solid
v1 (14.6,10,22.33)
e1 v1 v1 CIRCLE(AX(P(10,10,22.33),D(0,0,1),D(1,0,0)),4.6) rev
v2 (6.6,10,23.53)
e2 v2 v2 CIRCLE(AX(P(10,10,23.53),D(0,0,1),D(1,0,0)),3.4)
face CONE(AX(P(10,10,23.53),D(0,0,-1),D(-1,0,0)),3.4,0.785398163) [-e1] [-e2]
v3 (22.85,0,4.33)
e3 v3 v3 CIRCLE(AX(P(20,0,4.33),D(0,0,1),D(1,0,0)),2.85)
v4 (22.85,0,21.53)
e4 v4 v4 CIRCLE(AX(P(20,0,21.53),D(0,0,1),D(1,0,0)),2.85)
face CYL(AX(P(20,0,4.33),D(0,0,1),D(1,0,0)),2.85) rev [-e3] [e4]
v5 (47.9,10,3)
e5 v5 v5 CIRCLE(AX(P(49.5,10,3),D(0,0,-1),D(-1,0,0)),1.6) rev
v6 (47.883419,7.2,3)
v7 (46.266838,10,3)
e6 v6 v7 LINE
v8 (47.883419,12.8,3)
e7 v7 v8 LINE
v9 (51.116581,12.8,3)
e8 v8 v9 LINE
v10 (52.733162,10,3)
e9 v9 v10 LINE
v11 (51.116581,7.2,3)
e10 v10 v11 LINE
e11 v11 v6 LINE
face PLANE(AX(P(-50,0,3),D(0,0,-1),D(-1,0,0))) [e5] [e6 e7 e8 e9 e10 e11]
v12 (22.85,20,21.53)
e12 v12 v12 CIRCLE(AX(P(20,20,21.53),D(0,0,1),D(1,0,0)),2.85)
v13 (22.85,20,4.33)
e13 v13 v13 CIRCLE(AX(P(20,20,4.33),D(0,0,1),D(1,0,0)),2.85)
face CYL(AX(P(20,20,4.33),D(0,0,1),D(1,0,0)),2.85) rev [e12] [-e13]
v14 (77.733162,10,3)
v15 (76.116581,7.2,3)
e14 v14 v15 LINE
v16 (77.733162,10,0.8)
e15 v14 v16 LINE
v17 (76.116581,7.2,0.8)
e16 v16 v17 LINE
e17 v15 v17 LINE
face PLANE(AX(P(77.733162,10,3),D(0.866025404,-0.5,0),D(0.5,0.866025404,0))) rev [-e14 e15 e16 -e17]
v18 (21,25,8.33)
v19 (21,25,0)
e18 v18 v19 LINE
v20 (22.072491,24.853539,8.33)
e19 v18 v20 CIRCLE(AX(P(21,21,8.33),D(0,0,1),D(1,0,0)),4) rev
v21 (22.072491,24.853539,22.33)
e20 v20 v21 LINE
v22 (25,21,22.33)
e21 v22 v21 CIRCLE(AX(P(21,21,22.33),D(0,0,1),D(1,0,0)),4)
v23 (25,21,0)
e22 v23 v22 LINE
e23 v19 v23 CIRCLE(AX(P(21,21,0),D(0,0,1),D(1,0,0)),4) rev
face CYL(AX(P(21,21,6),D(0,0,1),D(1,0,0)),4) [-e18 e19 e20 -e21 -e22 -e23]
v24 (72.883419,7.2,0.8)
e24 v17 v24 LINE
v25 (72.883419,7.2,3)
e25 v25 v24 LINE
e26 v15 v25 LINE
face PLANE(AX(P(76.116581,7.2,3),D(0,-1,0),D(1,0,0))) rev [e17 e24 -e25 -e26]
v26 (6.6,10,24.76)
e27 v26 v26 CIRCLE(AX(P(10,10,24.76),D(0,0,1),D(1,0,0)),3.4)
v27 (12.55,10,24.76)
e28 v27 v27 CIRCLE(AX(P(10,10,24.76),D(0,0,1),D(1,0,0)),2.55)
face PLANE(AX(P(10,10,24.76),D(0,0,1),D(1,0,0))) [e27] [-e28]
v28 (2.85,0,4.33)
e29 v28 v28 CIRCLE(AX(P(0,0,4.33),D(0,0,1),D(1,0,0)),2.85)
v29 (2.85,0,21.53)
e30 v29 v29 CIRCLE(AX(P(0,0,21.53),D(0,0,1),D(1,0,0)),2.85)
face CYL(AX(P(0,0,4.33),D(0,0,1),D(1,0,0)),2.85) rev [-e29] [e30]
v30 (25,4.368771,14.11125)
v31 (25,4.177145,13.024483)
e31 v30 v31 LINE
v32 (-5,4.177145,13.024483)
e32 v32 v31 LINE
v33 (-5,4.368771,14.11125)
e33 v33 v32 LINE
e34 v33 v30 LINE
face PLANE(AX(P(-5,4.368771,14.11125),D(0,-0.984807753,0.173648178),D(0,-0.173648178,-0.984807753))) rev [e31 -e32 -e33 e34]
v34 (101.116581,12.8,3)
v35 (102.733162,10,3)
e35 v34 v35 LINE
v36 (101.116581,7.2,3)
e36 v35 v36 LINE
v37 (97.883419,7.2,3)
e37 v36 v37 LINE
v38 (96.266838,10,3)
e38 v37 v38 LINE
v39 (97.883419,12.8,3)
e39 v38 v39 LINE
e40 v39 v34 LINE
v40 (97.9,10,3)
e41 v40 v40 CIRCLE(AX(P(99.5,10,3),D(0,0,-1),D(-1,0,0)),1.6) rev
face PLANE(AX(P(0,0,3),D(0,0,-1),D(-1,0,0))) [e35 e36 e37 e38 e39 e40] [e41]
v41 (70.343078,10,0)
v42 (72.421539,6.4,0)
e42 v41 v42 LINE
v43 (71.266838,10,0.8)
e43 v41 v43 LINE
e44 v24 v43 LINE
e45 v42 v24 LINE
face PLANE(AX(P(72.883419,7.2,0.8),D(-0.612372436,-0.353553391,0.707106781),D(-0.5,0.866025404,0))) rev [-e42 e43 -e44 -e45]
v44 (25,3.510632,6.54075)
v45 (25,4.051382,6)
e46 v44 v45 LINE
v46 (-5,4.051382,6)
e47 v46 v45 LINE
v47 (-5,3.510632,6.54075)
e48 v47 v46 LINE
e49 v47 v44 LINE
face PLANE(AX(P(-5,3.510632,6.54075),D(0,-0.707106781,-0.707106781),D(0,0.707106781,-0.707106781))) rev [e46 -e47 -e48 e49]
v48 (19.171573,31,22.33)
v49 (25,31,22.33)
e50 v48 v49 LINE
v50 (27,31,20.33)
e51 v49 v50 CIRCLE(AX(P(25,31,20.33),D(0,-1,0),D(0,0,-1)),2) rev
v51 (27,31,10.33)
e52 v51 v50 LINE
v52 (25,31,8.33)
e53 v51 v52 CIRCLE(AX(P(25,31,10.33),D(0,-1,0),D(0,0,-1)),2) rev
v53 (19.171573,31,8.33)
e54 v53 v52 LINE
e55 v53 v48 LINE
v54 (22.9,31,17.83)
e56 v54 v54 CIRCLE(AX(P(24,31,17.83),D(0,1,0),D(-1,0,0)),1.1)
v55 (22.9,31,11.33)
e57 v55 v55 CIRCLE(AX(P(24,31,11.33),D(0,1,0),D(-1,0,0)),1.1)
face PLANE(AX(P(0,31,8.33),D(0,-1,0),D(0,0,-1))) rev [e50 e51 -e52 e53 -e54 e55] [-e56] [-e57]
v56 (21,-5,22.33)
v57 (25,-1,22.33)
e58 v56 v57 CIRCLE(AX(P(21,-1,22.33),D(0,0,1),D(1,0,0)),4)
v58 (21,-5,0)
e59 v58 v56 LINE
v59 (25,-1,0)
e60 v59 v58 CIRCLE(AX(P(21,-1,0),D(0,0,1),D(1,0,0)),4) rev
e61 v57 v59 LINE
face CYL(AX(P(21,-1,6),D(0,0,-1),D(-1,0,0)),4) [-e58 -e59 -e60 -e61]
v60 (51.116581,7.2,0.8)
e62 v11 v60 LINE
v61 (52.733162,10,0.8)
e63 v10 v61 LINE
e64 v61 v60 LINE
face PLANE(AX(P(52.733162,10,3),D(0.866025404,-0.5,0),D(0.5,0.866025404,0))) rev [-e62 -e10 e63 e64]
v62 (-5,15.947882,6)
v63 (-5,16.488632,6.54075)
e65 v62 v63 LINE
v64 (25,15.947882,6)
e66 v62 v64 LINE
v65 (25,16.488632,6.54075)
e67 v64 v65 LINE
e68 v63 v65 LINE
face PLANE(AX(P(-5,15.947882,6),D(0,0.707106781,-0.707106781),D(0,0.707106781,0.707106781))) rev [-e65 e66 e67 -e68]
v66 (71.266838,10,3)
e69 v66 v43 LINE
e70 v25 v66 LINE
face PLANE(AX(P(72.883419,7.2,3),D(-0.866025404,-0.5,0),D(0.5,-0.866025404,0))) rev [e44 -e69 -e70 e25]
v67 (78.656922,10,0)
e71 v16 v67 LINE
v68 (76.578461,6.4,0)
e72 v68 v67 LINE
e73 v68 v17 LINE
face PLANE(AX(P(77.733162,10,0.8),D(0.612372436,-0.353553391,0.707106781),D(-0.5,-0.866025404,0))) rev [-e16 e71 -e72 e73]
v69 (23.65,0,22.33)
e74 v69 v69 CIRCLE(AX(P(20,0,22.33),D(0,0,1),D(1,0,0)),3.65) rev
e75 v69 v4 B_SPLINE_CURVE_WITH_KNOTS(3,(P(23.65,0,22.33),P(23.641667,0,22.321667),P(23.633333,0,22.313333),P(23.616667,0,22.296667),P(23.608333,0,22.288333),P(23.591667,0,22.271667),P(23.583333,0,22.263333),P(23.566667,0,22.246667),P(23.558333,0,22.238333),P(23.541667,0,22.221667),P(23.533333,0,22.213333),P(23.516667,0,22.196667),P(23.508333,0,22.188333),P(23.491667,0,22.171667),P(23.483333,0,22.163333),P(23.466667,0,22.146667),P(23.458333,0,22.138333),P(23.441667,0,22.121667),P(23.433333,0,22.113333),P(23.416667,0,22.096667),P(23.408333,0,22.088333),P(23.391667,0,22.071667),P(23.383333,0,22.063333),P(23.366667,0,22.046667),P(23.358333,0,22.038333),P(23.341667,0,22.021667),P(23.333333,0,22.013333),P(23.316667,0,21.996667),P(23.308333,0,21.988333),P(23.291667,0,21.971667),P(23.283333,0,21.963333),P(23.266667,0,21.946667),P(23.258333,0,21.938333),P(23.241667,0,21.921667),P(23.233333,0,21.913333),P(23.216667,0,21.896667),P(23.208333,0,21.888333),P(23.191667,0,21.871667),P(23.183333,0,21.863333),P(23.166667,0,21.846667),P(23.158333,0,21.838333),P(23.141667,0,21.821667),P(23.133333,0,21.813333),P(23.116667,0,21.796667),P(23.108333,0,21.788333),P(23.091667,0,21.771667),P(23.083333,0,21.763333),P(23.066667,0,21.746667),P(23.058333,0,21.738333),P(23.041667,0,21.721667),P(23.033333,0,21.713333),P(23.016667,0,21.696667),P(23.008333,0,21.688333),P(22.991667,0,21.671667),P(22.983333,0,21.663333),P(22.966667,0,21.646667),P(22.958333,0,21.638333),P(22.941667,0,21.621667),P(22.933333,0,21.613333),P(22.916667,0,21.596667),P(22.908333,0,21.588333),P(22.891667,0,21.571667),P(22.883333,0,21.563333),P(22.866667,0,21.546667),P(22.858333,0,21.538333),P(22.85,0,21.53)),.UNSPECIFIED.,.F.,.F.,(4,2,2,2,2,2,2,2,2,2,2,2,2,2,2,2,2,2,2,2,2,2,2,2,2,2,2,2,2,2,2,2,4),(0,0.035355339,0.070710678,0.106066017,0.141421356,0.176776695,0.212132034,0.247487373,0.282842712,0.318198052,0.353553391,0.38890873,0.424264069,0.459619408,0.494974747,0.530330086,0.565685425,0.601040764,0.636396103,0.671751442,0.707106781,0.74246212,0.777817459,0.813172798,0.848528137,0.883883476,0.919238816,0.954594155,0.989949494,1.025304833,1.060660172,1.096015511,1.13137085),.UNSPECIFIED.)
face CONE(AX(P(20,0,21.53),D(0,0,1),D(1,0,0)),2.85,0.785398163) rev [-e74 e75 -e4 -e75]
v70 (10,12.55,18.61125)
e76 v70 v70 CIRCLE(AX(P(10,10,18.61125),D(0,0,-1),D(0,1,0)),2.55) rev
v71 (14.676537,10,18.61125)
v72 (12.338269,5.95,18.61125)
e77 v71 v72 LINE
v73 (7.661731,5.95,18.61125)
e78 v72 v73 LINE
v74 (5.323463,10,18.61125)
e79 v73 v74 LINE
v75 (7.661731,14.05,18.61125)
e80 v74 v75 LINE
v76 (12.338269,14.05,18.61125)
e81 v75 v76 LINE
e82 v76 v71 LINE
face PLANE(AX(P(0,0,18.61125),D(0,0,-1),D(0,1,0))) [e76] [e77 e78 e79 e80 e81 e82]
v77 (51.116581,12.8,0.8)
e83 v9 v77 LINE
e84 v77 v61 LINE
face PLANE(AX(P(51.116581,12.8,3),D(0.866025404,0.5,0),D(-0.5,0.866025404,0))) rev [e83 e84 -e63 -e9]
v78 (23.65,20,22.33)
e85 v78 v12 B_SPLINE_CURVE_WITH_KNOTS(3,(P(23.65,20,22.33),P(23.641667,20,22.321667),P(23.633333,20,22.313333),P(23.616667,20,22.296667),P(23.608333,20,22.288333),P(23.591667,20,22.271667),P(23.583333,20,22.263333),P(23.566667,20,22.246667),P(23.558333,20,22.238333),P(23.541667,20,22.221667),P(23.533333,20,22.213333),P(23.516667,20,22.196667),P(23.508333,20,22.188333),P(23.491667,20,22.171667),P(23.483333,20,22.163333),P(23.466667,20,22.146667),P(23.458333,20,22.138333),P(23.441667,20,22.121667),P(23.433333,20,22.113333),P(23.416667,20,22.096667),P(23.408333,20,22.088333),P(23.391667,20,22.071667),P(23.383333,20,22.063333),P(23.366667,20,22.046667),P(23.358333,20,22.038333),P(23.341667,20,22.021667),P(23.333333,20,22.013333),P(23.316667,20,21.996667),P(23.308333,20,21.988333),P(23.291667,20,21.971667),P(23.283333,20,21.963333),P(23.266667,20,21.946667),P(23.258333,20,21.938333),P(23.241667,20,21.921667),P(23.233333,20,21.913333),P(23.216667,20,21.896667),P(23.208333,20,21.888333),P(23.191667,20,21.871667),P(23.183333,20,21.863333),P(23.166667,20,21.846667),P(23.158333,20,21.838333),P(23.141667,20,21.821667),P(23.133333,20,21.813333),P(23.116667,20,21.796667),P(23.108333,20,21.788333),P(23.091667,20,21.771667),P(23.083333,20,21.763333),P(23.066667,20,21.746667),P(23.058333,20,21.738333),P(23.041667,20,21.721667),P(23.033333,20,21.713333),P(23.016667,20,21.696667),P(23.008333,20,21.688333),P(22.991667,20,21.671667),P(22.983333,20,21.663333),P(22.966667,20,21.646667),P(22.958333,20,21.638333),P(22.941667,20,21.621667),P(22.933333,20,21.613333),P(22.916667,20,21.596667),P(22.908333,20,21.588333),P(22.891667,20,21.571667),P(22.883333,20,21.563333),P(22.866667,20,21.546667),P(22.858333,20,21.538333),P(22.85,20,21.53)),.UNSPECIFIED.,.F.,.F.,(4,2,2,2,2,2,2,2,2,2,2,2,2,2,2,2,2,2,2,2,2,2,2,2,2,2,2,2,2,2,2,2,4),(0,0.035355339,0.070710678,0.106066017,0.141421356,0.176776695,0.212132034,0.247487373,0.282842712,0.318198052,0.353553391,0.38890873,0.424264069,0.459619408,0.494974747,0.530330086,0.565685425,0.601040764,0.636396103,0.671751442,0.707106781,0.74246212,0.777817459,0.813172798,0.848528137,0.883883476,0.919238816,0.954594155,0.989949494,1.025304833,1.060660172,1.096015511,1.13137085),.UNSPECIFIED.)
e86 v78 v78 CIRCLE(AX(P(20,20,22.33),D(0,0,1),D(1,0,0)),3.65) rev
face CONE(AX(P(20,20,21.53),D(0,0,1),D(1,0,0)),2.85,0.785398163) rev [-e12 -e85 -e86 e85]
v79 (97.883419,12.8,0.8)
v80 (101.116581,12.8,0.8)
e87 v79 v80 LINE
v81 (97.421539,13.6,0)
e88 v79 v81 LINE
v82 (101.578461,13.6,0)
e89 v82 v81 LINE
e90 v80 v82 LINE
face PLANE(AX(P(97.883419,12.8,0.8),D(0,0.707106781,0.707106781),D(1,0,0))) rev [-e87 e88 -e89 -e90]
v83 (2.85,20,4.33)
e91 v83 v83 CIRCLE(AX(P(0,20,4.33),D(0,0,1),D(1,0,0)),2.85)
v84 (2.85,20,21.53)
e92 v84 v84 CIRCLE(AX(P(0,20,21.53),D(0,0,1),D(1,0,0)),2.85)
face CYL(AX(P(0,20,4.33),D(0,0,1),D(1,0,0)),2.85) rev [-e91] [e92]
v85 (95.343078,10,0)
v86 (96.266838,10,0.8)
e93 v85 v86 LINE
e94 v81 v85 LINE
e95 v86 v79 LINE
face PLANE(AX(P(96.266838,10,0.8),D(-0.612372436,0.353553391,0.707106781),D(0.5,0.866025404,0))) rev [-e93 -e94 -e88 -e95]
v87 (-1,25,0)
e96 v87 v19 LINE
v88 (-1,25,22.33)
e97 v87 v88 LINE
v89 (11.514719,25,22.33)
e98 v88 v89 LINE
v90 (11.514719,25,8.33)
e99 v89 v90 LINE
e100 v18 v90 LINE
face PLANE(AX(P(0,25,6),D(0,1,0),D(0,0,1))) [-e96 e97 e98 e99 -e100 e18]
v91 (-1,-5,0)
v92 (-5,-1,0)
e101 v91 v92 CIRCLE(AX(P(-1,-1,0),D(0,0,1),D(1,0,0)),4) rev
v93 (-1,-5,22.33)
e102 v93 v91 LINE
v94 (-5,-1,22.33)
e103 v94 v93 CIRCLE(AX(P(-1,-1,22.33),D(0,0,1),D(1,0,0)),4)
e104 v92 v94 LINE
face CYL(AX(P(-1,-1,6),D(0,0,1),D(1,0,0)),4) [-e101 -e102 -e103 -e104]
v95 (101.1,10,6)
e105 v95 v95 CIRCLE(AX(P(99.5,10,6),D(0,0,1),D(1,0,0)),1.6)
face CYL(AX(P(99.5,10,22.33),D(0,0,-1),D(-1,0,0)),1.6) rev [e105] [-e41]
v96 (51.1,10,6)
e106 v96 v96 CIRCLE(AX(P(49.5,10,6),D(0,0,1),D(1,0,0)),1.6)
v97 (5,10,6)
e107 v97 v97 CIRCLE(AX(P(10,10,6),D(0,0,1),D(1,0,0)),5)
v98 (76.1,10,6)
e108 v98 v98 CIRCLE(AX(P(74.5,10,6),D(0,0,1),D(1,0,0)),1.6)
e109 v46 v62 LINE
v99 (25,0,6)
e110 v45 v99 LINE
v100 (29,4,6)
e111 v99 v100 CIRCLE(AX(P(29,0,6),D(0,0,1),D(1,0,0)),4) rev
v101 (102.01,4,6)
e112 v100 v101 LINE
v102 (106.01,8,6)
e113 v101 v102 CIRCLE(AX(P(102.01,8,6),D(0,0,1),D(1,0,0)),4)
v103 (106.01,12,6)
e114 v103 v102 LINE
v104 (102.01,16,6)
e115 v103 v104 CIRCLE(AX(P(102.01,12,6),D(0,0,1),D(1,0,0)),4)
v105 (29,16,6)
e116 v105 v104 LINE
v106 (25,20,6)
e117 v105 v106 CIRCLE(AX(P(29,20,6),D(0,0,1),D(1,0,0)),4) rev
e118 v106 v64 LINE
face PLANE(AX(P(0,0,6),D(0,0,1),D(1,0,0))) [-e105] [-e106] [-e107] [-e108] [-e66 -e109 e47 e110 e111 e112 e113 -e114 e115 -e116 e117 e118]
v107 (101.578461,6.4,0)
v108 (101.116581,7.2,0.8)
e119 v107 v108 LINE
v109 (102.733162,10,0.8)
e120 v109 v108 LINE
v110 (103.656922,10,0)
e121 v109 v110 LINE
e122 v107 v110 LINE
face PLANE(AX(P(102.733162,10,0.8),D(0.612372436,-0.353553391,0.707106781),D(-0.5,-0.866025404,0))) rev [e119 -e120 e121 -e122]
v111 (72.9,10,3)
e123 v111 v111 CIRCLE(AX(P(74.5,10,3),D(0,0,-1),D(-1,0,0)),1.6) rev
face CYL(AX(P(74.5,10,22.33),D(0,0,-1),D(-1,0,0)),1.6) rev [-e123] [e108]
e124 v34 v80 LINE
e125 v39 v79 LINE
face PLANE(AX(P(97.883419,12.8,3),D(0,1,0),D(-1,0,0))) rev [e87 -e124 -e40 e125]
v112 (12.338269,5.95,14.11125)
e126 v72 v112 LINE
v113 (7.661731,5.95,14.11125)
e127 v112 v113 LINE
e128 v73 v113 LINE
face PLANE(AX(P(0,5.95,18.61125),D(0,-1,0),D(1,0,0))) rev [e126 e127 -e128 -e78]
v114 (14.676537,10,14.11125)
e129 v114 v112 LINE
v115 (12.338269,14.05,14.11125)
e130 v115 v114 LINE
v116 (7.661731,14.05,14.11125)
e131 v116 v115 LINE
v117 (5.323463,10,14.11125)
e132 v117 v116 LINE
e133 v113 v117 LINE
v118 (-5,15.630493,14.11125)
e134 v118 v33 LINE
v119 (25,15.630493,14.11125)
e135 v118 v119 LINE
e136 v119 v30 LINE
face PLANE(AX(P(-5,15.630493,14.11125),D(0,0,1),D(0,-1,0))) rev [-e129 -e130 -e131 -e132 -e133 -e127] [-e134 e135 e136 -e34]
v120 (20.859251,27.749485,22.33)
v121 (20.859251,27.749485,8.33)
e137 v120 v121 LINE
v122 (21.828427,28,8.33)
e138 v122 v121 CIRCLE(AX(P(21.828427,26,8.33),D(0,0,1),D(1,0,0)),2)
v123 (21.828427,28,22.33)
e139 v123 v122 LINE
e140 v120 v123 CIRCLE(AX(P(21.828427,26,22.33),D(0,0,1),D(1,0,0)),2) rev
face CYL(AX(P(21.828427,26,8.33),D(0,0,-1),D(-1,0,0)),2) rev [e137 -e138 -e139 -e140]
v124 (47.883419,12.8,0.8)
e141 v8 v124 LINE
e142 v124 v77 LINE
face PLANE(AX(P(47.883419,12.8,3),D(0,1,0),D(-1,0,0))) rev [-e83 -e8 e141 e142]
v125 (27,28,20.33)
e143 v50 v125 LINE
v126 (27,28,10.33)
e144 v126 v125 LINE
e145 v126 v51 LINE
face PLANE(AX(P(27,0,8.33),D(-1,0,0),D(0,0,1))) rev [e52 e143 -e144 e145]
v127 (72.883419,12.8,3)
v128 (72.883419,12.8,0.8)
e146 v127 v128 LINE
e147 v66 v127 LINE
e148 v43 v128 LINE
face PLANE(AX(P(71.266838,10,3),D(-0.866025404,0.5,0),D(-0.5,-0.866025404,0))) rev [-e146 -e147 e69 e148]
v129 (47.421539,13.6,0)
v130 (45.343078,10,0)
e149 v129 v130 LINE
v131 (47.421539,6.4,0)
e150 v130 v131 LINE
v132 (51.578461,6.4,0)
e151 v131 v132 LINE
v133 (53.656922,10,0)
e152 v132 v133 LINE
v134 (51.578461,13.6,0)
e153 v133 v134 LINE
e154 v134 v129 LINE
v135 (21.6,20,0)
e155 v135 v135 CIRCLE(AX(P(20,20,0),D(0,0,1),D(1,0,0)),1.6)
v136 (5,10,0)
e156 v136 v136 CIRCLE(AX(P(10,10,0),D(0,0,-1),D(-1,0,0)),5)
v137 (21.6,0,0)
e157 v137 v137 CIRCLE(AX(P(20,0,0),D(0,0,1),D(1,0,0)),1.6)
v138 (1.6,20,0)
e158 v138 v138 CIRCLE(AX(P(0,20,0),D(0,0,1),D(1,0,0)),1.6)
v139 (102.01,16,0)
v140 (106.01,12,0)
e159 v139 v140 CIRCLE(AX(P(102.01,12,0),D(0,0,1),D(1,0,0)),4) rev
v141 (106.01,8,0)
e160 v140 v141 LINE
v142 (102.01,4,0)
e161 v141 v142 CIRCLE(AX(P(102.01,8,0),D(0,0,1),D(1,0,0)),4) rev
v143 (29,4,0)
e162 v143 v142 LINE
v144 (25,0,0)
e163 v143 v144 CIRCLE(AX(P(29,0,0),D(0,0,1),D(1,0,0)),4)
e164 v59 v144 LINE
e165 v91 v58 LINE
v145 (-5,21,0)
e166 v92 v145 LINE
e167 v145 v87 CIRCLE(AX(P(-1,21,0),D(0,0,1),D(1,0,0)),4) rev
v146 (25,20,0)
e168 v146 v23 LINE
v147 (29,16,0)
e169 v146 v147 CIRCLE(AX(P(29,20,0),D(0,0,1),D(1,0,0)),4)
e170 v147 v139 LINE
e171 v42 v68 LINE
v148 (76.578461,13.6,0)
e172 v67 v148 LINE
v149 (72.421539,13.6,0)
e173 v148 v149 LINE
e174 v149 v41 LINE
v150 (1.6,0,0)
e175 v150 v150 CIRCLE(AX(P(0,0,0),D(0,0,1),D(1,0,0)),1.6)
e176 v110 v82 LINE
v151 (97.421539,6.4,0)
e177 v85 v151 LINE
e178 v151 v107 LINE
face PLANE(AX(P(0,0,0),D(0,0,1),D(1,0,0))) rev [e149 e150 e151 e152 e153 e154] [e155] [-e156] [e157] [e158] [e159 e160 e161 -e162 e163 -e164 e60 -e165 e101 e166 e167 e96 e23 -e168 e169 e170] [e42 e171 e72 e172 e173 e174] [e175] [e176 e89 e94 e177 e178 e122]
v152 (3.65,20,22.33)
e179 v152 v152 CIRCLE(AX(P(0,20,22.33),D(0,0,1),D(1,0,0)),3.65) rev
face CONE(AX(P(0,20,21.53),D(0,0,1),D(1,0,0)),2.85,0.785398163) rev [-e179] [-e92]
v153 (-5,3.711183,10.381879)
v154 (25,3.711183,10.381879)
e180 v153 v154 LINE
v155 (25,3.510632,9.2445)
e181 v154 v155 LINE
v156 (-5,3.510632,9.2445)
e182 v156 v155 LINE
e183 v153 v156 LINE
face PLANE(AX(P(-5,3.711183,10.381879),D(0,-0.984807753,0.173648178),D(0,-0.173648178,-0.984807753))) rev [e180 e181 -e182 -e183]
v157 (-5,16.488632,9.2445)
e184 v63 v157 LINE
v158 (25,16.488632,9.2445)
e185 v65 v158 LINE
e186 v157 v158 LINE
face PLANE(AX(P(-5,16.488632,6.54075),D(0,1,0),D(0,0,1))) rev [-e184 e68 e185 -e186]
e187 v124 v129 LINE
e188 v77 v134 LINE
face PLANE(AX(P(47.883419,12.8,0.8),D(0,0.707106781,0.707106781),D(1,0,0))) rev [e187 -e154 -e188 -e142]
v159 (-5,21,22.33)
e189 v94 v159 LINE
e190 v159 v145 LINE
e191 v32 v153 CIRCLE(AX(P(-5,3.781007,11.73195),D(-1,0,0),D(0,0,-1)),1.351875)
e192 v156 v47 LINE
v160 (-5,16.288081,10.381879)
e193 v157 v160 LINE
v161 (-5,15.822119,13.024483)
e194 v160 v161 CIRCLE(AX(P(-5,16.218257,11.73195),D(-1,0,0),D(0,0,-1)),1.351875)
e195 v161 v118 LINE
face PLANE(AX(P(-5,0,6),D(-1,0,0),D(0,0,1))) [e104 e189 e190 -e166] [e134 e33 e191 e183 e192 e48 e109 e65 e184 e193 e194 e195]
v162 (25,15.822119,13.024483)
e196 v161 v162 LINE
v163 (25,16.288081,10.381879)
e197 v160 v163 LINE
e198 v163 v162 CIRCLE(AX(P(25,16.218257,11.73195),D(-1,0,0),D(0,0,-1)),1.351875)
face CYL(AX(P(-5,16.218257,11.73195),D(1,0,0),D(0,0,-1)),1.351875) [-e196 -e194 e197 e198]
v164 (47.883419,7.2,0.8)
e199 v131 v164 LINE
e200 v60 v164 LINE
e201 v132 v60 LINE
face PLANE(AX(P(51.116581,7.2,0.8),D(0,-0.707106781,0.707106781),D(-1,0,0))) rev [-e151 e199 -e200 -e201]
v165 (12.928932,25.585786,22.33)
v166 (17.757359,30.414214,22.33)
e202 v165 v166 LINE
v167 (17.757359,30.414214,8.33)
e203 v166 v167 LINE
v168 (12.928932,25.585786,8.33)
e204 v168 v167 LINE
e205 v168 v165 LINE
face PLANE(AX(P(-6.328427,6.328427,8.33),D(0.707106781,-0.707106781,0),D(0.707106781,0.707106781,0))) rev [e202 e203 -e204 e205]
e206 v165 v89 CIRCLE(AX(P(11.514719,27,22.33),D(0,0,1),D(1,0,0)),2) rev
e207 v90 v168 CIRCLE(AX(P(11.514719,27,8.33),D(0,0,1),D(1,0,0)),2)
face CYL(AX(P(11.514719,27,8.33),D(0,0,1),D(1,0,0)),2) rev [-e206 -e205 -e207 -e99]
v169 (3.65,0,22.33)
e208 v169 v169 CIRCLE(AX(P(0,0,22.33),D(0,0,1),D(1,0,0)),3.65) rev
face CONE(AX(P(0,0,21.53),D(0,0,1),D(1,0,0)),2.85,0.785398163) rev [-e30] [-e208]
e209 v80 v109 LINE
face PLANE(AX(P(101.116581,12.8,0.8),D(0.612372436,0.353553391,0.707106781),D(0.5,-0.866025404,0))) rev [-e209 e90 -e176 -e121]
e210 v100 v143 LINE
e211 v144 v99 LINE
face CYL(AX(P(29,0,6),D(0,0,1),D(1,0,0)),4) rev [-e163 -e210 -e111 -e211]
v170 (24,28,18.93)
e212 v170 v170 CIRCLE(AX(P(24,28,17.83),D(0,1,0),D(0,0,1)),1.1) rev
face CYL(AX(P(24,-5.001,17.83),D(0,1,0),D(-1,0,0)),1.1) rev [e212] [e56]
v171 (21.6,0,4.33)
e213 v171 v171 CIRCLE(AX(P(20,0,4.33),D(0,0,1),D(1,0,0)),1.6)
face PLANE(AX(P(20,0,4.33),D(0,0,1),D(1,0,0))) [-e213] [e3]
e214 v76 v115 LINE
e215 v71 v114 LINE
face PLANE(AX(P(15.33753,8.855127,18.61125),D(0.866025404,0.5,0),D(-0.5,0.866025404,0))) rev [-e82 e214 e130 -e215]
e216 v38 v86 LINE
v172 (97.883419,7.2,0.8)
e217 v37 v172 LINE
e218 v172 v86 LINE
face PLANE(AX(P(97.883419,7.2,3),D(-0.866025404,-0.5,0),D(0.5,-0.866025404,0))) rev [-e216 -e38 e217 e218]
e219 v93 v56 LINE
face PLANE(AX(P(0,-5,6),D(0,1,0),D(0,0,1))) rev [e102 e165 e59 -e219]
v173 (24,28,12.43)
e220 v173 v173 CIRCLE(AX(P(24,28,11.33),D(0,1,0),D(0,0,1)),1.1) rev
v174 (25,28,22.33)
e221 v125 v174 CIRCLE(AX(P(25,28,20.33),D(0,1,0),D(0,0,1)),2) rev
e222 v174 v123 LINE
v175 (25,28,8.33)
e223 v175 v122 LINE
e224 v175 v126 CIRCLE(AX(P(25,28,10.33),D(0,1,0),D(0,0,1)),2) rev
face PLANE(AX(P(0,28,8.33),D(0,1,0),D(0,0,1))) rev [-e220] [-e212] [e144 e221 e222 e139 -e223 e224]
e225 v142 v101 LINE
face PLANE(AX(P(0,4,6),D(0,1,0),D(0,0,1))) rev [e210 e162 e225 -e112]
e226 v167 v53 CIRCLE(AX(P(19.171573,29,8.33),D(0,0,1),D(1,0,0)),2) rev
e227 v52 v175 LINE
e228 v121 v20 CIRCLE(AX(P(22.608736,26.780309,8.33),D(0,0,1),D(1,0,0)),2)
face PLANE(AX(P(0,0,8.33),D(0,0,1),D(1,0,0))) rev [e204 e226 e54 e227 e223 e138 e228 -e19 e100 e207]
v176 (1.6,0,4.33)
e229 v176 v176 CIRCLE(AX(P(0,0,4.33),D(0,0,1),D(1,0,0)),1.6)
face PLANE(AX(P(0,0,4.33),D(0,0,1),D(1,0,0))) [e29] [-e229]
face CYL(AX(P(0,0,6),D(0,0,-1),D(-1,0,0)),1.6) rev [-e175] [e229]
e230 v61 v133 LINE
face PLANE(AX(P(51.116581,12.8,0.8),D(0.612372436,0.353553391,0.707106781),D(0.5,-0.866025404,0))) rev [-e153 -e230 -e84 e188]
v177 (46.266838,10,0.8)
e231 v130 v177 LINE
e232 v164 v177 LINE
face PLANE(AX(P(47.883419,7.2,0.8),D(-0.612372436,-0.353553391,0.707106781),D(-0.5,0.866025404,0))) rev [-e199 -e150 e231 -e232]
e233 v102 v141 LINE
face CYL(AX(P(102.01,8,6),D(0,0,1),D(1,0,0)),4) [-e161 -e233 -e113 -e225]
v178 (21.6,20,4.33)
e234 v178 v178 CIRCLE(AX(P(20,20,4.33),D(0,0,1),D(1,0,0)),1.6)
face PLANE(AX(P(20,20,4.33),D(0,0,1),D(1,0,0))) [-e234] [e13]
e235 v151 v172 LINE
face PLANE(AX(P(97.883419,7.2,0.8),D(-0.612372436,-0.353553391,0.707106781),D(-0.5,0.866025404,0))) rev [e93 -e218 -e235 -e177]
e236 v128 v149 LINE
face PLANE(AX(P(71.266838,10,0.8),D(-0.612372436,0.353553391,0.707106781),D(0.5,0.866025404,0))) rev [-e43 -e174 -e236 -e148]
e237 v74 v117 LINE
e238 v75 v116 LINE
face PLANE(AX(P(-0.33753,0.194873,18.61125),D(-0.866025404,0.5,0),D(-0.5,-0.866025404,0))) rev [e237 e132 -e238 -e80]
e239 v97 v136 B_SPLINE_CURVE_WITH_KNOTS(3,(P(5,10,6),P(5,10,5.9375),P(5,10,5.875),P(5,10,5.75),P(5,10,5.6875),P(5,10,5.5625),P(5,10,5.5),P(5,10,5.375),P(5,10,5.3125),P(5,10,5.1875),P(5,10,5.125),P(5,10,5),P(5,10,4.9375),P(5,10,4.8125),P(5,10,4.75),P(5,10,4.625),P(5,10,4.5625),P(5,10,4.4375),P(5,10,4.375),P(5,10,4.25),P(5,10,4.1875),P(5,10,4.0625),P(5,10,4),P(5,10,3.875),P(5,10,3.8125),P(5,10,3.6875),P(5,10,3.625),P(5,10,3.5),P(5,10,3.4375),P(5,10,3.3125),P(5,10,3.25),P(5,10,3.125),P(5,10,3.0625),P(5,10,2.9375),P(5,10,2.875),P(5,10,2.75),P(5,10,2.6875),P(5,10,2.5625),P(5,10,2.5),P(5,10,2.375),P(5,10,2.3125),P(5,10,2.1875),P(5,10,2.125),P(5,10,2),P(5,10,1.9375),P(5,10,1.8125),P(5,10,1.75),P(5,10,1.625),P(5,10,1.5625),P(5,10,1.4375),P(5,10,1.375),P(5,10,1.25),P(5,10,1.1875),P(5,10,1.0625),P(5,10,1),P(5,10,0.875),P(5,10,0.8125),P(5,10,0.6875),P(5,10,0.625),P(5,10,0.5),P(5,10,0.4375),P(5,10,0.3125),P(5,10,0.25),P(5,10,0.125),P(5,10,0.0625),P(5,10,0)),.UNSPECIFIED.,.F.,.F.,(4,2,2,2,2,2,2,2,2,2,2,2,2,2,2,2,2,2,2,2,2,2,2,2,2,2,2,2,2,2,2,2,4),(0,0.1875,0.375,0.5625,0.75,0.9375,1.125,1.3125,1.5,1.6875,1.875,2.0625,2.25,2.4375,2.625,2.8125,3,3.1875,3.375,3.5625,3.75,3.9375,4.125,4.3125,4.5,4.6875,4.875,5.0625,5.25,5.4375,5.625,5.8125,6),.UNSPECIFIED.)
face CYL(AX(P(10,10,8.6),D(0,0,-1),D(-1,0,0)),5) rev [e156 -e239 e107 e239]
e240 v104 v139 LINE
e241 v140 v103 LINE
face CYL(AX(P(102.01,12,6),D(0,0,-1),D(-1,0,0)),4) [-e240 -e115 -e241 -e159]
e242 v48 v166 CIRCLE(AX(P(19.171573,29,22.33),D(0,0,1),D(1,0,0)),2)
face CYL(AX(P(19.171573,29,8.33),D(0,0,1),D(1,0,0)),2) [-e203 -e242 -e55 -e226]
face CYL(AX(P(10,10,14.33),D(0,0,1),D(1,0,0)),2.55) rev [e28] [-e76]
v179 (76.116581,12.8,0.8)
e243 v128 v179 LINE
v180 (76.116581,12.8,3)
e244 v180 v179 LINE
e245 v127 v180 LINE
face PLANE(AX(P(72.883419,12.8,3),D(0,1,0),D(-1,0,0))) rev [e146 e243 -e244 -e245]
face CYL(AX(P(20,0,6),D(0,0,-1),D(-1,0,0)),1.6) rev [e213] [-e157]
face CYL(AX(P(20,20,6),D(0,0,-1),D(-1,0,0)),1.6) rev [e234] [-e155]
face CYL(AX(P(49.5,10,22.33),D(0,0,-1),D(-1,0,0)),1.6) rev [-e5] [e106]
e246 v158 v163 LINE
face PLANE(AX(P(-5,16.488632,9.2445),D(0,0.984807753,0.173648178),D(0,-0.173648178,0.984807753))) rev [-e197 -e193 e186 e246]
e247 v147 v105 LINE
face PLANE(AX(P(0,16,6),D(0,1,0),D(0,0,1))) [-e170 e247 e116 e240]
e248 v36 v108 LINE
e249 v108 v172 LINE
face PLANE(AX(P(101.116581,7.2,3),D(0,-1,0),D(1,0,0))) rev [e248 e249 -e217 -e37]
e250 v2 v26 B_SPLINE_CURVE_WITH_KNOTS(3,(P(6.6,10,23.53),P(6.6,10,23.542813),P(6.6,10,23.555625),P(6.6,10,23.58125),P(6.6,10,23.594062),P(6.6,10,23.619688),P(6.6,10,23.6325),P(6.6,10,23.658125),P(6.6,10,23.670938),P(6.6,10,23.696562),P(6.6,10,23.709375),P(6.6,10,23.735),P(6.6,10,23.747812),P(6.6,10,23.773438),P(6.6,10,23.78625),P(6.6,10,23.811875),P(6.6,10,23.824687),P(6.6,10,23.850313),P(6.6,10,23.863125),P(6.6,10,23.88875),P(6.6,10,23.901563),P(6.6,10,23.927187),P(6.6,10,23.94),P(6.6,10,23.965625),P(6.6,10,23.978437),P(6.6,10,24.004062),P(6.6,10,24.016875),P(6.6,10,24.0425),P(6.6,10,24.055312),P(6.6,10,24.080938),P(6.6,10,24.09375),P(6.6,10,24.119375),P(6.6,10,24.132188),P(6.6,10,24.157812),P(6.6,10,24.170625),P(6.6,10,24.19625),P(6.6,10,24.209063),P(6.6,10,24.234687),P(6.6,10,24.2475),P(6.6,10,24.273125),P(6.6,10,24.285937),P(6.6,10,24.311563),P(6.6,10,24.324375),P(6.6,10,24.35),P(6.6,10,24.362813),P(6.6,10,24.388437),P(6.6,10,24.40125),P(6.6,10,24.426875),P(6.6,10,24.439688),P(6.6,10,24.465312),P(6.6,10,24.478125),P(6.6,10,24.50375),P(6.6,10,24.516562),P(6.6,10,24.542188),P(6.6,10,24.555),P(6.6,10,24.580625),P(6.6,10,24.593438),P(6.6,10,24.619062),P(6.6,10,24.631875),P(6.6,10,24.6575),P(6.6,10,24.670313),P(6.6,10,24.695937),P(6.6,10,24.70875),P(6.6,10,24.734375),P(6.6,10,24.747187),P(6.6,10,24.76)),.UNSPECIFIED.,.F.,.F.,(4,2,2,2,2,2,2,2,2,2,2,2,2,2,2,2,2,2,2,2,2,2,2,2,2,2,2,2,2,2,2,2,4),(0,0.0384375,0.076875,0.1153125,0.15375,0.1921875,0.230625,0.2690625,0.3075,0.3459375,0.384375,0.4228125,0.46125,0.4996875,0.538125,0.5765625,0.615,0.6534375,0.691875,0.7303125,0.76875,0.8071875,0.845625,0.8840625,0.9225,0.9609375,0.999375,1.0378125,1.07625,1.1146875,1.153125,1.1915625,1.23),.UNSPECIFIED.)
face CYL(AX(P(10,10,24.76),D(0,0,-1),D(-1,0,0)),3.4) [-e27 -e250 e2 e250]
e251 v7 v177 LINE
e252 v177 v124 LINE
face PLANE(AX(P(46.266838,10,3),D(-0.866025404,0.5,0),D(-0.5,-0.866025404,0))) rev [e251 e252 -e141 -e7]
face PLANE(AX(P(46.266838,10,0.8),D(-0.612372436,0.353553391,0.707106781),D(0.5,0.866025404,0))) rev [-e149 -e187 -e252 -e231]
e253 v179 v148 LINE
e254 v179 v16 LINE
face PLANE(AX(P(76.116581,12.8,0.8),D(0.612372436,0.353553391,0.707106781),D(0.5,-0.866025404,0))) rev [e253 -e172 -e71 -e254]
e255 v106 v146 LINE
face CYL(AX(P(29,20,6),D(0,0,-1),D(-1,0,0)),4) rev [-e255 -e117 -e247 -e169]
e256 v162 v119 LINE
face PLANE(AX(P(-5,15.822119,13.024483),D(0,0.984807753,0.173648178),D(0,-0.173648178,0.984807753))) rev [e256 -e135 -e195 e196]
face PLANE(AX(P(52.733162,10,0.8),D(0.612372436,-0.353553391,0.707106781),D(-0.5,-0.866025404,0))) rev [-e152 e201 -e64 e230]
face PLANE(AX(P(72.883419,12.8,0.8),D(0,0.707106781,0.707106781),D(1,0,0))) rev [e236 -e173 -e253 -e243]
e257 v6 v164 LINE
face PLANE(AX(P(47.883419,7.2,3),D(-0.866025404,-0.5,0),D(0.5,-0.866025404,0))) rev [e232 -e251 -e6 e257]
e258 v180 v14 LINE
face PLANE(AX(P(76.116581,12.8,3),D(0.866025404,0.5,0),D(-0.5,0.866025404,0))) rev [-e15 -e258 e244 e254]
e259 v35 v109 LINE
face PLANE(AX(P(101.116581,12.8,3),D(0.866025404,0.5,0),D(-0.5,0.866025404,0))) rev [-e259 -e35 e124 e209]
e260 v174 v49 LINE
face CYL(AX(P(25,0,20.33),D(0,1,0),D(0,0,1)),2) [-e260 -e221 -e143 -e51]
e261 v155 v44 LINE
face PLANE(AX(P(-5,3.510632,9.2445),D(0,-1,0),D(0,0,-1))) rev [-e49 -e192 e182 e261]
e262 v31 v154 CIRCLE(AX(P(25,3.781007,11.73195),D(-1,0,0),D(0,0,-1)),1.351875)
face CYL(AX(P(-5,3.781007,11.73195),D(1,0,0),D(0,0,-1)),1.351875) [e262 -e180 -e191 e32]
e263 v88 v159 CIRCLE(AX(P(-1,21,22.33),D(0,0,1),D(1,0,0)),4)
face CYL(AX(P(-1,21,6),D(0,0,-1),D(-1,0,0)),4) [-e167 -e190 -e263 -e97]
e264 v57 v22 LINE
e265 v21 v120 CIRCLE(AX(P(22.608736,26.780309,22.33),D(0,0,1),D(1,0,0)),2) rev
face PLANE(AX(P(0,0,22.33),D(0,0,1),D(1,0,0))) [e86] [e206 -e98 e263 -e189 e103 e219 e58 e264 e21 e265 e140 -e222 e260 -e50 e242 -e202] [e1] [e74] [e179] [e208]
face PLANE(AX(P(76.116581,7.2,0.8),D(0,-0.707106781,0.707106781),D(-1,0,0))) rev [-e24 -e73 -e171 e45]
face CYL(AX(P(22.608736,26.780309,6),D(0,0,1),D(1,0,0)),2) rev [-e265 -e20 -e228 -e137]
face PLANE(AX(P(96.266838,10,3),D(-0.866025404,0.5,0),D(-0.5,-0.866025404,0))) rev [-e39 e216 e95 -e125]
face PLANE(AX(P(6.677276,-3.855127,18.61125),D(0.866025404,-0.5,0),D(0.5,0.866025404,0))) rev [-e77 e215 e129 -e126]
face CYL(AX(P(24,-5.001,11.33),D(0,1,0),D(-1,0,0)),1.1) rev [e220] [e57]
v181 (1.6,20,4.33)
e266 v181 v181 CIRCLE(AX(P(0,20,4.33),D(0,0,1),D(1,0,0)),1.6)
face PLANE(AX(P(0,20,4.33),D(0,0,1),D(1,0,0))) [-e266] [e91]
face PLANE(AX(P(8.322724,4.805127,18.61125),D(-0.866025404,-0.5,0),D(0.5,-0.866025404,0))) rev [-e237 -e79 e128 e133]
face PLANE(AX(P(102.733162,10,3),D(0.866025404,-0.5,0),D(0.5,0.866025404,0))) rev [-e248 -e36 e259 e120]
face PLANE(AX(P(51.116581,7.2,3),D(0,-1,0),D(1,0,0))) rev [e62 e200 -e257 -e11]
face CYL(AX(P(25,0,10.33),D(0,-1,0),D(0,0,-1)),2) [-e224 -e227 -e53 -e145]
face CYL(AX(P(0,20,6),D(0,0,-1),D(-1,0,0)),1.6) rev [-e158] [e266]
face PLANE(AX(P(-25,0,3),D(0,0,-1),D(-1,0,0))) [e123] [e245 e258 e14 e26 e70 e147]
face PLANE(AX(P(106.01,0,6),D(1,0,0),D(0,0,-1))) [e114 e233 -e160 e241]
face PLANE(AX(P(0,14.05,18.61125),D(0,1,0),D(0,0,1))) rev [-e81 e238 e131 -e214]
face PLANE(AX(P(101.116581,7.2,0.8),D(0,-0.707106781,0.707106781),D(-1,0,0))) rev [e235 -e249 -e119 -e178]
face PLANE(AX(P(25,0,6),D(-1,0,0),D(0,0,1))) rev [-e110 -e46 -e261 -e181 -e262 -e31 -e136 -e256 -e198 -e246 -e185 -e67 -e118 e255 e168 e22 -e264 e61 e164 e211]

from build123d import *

# Parameters (mm, degrees)
SKETCH1_W                  = 30
SKETCH1_H                  = 30
SKETCH1_R                  = 1.6
SKETCH1_W_2                = 81.01
SKETCH1_H_2                = 12
BOSS_EXTRUDE1_DEPTH        = 6
SKETCH1_3_W                = 30
SKETCH1_3_H                = 30
SKETCH1_3_R                = 1.6
BOSS_EXTRUDE2_DEPTH        = 22.33
CUT_EXTRUDE1_DEPTH         = 88.671255266
SKETCH3_R                  = 2.55
CUT_EXTRUDE2_DEPTH         = 8
CUT_EXTRUDE3_DEPTH         = 4.5
SKETCH6_R                  = 5
CUT_EXTRUDE5_DEPTH         = 8.6
SKETCH7_R                  = 1.6
CUT_EXTRUDE6_DEPTH         = 112.183402538
SKETCH8_R                  = 2.85
CUT_EXTRUDE7_DEPTH         = 18
BOSS_EXTRUDE3_START        = 2.43
SKETCH9_R                  = 3.4
SKETCH9_R_2                = 2.55
BOSS_EXTRUDE3_DEPTH        = 2.43
CHAMFER1_SIZE              = 1.2
FILLET3_R                  = 4
CHAMFER2_SIZE              = 0.8
BOSS_EXTRUDE6_DEPTH        = 14
CUT_EXTRUDE10_REACH        = 116.661
SKETCH17_R                 = 1.1
FILLET5_R                  = 2
CUT_EXTRUDE11_DEPTH        = 3
CHAMFER3_SIZE              = 0.8
LPATTERN2_COUNT            = 3
LPATTERN2_PITCH            = 25
CHAMFER3_OF_LPATTERN2_SIZE = 0.8


with BuildPart() as part:
    # Sketch1 → Boss-Extrude1 (new body)
    # profile 1 of 2: a face of its own
    with BuildSketch(Plane.XY):
        with Locations((10, 10)):
            Rectangle(SKETCH1_W, SKETCH1_H)
        with Locations((20, 0)):
            Circle(SKETCH1_R, mode=Mode.SUBTRACT)
        with Locations((20, 20)):
            Circle(SKETCH1_R, mode=Mode.SUBTRACT)
        with Locations((0, 20)):
            Circle(SKETCH1_R, mode=Mode.SUBTRACT)
        Circle(SKETCH1_R, mode=Mode.SUBTRACT)
    # profile 2 of 2: a face of its own
    with BuildSketch(Plane.XY):
        with Locations((65.505, 10)):
            Rectangle(SKETCH1_W_2, SKETCH1_H_2)
    extrude(amount=BOSS_EXTRUDE1_DEPTH)

    # Sketch1<3> → Boss-Extrude2 (add)
    with BuildSketch(Plane.XY):
        with Locations((10, 10)):
            Rectangle(SKETCH1_3_W, SKETCH1_3_H)
        with Locations((20, 0)):
            Circle(SKETCH1_3_R, mode=Mode.SUBTRACT)
        with Locations((20, 20)):
            Circle(SKETCH1_3_R, mode=Mode.SUBTRACT)
        with Locations((0, 20)):
            Circle(SKETCH1_3_R, mode=Mode.SUBTRACT)
        Circle(SKETCH1_3_R, mode=Mode.SUBTRACT)
    extrude(amount=BOSS_EXTRUDE2_DEPTH)

    # Sketch2 → Cut-Extrude1 (cut, through all)
    with BuildSketch(Plane(origin=(25, 0, 0), x_dir=(0, 0, -1), z_dir=(1, 0, 0))):
        with BuildLine():
            Line((-6.54075, 16.488632043), (-9.2445, 16.488632043))
            Line((-9.2445, 16.488632043), (-10.381879417, 16.288081364))
            ThreePointArc((-10.381879417, 16.288081364), (-11.49719937, 14.886920062), (-13.024482689, 15.822119108))
            Line((-13.024482689, 15.822119108), (-14.11125, 15.630492709))
            Line((-14.11125, 15.630492709), (-14.11125, 4.368771376))
            Line((-14.11125, 4.368771376), (-13.024482689, 4.177144977))
            ThreePointArc((-13.024482689, 4.177144977), (-11.49719937, 5.112344024), (-10.381879417, 3.711182721))
            Line((-10.381879417, 3.711182721), (-9.2445, 3.510632043))
            Line((-9.2445, 3.510632043), (-6.54075, 3.510632043))
            Line((-6.54075, 3.510632043), (-6, 4.051382043))
            Line((-6, 4.051382043), (-6, 15.947882043))
            Line((-6, 15.947882043), (-6.54075, 16.488632043))
        make_face()
    extrude(amount=-CUT_EXTRUDE1_DEPTH, mode=Mode.SUBTRACT)

    # Sketch3 → Cut-Extrude2 (cut)
    with BuildSketch(Plane.XY.offset(22.33)):
        with Locations((10, 10)):
            Circle(SKETCH3_R)
    extrude(amount=-CUT_EXTRUDE2_DEPTH, mode=Mode.SUBTRACT)

    # Sketch5 → Cut-Extrude3 (cut)
    with BuildSketch(Plane(origin=(0, 0, 14.11125), x_dir=(-1, 0, 0), z_dir=(0, 0, -1))):
        Polygon((-5.32346282, 10), (-7.66173141, 14.05), (-12.33826859, 14.05), (-14.67653718, 10), (-12.33826859, 5.95), (-7.66173141, 5.95), align=None)
    extrude(amount=-CUT_EXTRUDE3_DEPTH, mode=Mode.SUBTRACT)

    # Sketch6 → Cut-Extrude5 (cut)
    with BuildSketch(Plane(origin=(0, 0, 0), x_dir=(-1, 0, 0), z_dir=(0, 0, -1))):
        with Locations((-10, 10)):
            Circle(SKETCH6_R)
    extrude(amount=-CUT_EXTRUDE5_DEPTH, mode=Mode.SUBTRACT)

    # Sketch7 → Cut-Extrude6 (cut, through all)
    with BuildSketch(Plane(origin=(0, 0, 0), x_dir=(-1, 0, 0), z_dir=(0, 0, -1))):
        with BuildLine():
            ThreePointArc((-101.1, 10), (-99.5, 8.4), (-97.9, 10))
            Line((-97.9, 10), (-101.1, 10))
        make_face()
        with BuildLine():
            Line((-101.1, 10), (-97.9, 10))
            ThreePointArc((-97.9, 10), (-99.5, 11.6), (-101.1, 10))
        make_face()
        with Locations((-74.5, 10)):
            Circle(SKETCH7_R)
        with Locations((-49.5, 10)):
            Circle(SKETCH7_R)
    extrude(amount=-CUT_EXTRUDE6_DEPTH, mode=Mode.SUBTRACT)

    # Sketch8 → Cut-Extrude7 (cut)
    with BuildSketch(Plane.XY.offset(22.33)):
        with Locations((20, 20)):
            Circle(SKETCH8_R)
        with Locations((20, 0)):
            Circle(SKETCH8_R)
        Circle(SKETCH8_R)
        with Locations((0, 20)):
            Circle(SKETCH8_R)
    extrude(amount=-CUT_EXTRUDE7_DEPTH, mode=Mode.SUBTRACT)

    # Sketch9 → Boss-Extrude3 (add)
    with BuildSketch(Plane.XY.offset(22.33).offset(BOSS_EXTRUDE3_START)):
        with Locations(Location((10, 10, 0), (0, 0, 180))):
            Circle(SKETCH9_R)
        with Locations((10, 10)):
            Circle(SKETCH9_R_2, mode=Mode.SUBTRACT)
    extrude(amount=-BOSS_EXTRUDE3_DEPTH)

    # Chamfer1
    chamfer1_edges = [part.edges().sort_by_distance(p)[0] for p in [
        (13.4, 10, 22.33),
    ]]
    chamfer(chamfer1_edges, length=CHAMFER1_SIZE)

    # Fillet3
    fillet3_edges = [part.edges().sort_by_distance(p)[0] for p in [
        (-5, -5, 11.165),
        (-5, 25, 11.165),
        (25, 25, 11.165),
        (25, 16, 3),
        (106.01, 16, 3),
        (106.01, 4, 3),
        (25, 4, 3),
        (25, -5, 11.165),
    ]]
    fillet(fillet3_edges, radius=FILLET3_R)

    # Chamfer2
    chamfer2_edges = [part.edges().sort_by_distance(p)[0] for p in [
        (-2.85, 20, 22.33),
        (-2.85, 0, 22.33),
        (17.15, 0, 22.33),
        (17.15, 20, 22.33),
    ]]
    chamfer(chamfer2_edges, length=CHAMFER2_SIZE)

    # Sketch15 → Boss-Extrude6 (add)
    with BuildSketch(Plane.XY.offset(22.33)):
        Polygon((18.343145751, 31), (12.343145751, 25), (18, 25), (21, 28), (27, 28), (27, 31), align=None)
    extrude(amount=-BOSS_EXTRUDE6_DEPTH)

    # Sketch17 → Cut-Extrude10 (cut, up to next)
    with BuildSketch(Plane(origin=(0, 31, 0), x_dir=(1, 0, 0), z_dir=(0, 1, 0)), mode=Mode.PRIVATE) as cut_extrude10_sk1:
        with Locations(Location((24, -11.33, 0), (0, 0, 180))):
            Circle(SKETCH17_R)
    cut_extrude10_tool1 = extrude(cut_extrude10_sk1.sketch, amount=-CUT_EXTRUDE10_REACH, mode=Mode.PRIVATE) & part.part
    # Sketch17 → Cut-Extrude10 (cut, up to next)
    with BuildSketch(Plane(origin=(0, 31, 0), x_dir=(1, 0, 0), z_dir=(0, 1, 0)), mode=Mode.PRIVATE) as cut_extrude10_sk2:
        with Locations(Location((24, -17.83, 0), (0, 0, 180))):
            Circle(SKETCH17_R)
    cut_extrude10_tool2 = extrude(cut_extrude10_sk2.sketch, amount=-CUT_EXTRUDE10_REACH, mode=Mode.PRIVATE) & part.part
    add(cut_extrude10_tool1.solids().sort_by_distance((24, 31, 11.33))[0], mode=Mode.SUBTRACT)
    add(cut_extrude10_tool2.solids().sort_by_distance((24, 31, 17.83))[0], mode=Mode.SUBTRACT)

    # Fillet5
    # the kernel refuses this fillet: 2 mm, written as the material it adds along each edge
    with BuildSketch(Plane(origin=(21, 28, 22.33), x_dir=(-0.7071067811865475, -0.7071067811865475, 0), z_dir=(0, 0, -1))) as fillet5_piece_1:
        with BuildLine():
            CenterArc((FILLET5_R * 0.414213562373, -FILLET5_R), FILLET5_R, 90, 45)
            Line((-FILLET5_R * 0.292893218813, -FILLET5_R * 0.292893218813), (0, 0))
            Line((0, 0), (FILLET5_R * 0.414213562373, 0))
        make_face()
    extrude(amount=14)
    with BuildSketch(Plane(origin=(12.343145751, 25, 22.33), x_dir=(-1, 0, 0), z_dir=(0, 0, -1))) as fillet5_piece_2:
        with BuildLine():
            CenterArc((FILLET5_R * 0.414213562373, FILLET5_R), FILLET5_R, 225, 45)
            Line((-FILLET5_R * 0.292893218813, FILLET5_R * 0.292893218813), (0, 0))
            Line((0, 0), (FILLET5_R * 0.414213562373, 0))
        make_face()
    extrude(amount=14)
    with BuildSketch(Plane(origin=(18, 25, 22.33), x_dir=(0.9993539414176275, -0.03594022500003582, 0), z_dir=(0, 0, -1))) as fillet5_piece_3:
        with BuildLine():
            CenterArc((4.541773641, -1.944797545), FILLET5_R, 103.492916805, 119.447416414)
            Line((3.07764659, -3.307270289), (2.931233885, -3.443517564))
            Line((2.931233885, -3.443517564), (-0.146412705, -0.136247274))
            Line((-0.146412705, -0.136247274), (0.007188045, 0.199870788))
            ThreePointArc((0.007188045, 0.199870788), (3.005249869, 0.092050113), (4.028458305, 0.194479755))
            Line((4.028458305, 0.194479755), (4.075123335, 0))
        make_face()
    extrude(amount=14)
    # the kernel refuses this fillet: 2 mm, written as the material it takes off along each edge
    with BuildSketch(Plane(origin=(27, 23, 22.33), x_dir=(-1, 0, 0), z_dir=(0, 1, 0))) as fillet5_2_piece_1:
        with BuildLine():
            CenterArc((FILLET5_R, -FILLET5_R), FILLET5_R, 90, 90)
            Line((0, -FILLET5_R), (0, 0))
            Line((0, 0), (FILLET5_R, 0))
        make_face()
    extrude(amount=13, mode=Mode.SUBTRACT)
    with BuildSketch(Plane(origin=(27, 23, 8.33), x_dir=(-1, 0, 0), z_dir=(0, 1, 0))) as fillet5_2_piece_2:
        with BuildLine():
            CenterArc((FILLET5_R, FILLET5_R), FILLET5_R, 180, 90)
            Line((0, FILLET5_R), (0, 0))
            Line((0, 0), (FILLET5_R, 0))
        make_face()
    extrude(amount=13, mode=Mode.SUBTRACT)
    with BuildSketch(Plane(origin=(18.343145751, 31, 24.401067812), x_dir=(-0.7071067811865476, -0.7071067811865476, 0), z_dir=(0, 0, -1))) as fillet5_2_piece_3:
        with BuildLine():
            CenterArc((FILLET5_R * 0.414213562373, -FILLET5_R), FILLET5_R, 90, 45)
            Line((-FILLET5_R * 0.292893218813, -FILLET5_R * 0.292893218813), (0, 0))
            Line((0, 0), (FILLET5_R * 0.414213562373, 0))
        make_face()
    extrude(amount=18.142135624, mode=Mode.SUBTRACT)

    # Sketch10 → Cut-Extrude11 (cut)
    with BuildSketch(Plane(origin=(0, 0, 0), x_dir=(-1, 0, 0), z_dir=(0, 0, -1))):
        Polygon((-97.883419246, 12.8), (-101.116580754, 12.8), (-102.733161507, 10), (-101.116580754, 7.2), (-97.883419246, 7.2), (-96.266838493, 10), align=None)
    cut_extrude11 = extrude(amount=-CUT_EXTRUDE11_DEPTH, mode=Mode.SUBTRACT)

    # Chamfer3
    chamfer3_edges = [part.edges().sort_by_distance(p)[0] for p in [
        (97.075128869, 11.4, 0),
        (99.5, 12.8, 0),
        (101.924871131, 11.4, 0),
        (101.924871131, 8.6, 0),
        (99.5, 7.2, 0),
        (97.075128869, 8.6, 0),
    ]]
    chamfer(chamfer3_edges, length=CHAMFER3_SIZE)

    # LPattern2: Cut-Extrude11 ×3
    with Locations(*[(-i * LPATTERN2_PITCH, 0, 0) for i in range(1, LPATTERN2_COUNT)]):
        add(cut_extrude11, mode=Mode.SUBTRACT)

    # Chamfer3 of LPattern2
    chamfer3_of_lpattern2_edges = [part.edges().sort_by_distance(p)[0] for p in [
        (72.075128869, 11.4, 0),
        (74.5, 12.8, 0),
        (76.924871131, 11.4, 0),
        (76.924871131, 8.6, 0),
        (74.5, 7.2, 0),
        (72.075128869, 8.6, 0),
        (47.075128869, 11.4, 0),
        (49.5, 12.8, 0),
        (51.924871131, 11.4, 0),
        (51.924871131, 8.6, 0),
        (49.5, 7.2, 0),
        (47.075128869, 8.6, 0),
    ]]
    chamfer(chamfer3_of_lpattern2_edges, length=CHAMFER3_OF_LPATTERN2_SIZE)


solid = part.part
